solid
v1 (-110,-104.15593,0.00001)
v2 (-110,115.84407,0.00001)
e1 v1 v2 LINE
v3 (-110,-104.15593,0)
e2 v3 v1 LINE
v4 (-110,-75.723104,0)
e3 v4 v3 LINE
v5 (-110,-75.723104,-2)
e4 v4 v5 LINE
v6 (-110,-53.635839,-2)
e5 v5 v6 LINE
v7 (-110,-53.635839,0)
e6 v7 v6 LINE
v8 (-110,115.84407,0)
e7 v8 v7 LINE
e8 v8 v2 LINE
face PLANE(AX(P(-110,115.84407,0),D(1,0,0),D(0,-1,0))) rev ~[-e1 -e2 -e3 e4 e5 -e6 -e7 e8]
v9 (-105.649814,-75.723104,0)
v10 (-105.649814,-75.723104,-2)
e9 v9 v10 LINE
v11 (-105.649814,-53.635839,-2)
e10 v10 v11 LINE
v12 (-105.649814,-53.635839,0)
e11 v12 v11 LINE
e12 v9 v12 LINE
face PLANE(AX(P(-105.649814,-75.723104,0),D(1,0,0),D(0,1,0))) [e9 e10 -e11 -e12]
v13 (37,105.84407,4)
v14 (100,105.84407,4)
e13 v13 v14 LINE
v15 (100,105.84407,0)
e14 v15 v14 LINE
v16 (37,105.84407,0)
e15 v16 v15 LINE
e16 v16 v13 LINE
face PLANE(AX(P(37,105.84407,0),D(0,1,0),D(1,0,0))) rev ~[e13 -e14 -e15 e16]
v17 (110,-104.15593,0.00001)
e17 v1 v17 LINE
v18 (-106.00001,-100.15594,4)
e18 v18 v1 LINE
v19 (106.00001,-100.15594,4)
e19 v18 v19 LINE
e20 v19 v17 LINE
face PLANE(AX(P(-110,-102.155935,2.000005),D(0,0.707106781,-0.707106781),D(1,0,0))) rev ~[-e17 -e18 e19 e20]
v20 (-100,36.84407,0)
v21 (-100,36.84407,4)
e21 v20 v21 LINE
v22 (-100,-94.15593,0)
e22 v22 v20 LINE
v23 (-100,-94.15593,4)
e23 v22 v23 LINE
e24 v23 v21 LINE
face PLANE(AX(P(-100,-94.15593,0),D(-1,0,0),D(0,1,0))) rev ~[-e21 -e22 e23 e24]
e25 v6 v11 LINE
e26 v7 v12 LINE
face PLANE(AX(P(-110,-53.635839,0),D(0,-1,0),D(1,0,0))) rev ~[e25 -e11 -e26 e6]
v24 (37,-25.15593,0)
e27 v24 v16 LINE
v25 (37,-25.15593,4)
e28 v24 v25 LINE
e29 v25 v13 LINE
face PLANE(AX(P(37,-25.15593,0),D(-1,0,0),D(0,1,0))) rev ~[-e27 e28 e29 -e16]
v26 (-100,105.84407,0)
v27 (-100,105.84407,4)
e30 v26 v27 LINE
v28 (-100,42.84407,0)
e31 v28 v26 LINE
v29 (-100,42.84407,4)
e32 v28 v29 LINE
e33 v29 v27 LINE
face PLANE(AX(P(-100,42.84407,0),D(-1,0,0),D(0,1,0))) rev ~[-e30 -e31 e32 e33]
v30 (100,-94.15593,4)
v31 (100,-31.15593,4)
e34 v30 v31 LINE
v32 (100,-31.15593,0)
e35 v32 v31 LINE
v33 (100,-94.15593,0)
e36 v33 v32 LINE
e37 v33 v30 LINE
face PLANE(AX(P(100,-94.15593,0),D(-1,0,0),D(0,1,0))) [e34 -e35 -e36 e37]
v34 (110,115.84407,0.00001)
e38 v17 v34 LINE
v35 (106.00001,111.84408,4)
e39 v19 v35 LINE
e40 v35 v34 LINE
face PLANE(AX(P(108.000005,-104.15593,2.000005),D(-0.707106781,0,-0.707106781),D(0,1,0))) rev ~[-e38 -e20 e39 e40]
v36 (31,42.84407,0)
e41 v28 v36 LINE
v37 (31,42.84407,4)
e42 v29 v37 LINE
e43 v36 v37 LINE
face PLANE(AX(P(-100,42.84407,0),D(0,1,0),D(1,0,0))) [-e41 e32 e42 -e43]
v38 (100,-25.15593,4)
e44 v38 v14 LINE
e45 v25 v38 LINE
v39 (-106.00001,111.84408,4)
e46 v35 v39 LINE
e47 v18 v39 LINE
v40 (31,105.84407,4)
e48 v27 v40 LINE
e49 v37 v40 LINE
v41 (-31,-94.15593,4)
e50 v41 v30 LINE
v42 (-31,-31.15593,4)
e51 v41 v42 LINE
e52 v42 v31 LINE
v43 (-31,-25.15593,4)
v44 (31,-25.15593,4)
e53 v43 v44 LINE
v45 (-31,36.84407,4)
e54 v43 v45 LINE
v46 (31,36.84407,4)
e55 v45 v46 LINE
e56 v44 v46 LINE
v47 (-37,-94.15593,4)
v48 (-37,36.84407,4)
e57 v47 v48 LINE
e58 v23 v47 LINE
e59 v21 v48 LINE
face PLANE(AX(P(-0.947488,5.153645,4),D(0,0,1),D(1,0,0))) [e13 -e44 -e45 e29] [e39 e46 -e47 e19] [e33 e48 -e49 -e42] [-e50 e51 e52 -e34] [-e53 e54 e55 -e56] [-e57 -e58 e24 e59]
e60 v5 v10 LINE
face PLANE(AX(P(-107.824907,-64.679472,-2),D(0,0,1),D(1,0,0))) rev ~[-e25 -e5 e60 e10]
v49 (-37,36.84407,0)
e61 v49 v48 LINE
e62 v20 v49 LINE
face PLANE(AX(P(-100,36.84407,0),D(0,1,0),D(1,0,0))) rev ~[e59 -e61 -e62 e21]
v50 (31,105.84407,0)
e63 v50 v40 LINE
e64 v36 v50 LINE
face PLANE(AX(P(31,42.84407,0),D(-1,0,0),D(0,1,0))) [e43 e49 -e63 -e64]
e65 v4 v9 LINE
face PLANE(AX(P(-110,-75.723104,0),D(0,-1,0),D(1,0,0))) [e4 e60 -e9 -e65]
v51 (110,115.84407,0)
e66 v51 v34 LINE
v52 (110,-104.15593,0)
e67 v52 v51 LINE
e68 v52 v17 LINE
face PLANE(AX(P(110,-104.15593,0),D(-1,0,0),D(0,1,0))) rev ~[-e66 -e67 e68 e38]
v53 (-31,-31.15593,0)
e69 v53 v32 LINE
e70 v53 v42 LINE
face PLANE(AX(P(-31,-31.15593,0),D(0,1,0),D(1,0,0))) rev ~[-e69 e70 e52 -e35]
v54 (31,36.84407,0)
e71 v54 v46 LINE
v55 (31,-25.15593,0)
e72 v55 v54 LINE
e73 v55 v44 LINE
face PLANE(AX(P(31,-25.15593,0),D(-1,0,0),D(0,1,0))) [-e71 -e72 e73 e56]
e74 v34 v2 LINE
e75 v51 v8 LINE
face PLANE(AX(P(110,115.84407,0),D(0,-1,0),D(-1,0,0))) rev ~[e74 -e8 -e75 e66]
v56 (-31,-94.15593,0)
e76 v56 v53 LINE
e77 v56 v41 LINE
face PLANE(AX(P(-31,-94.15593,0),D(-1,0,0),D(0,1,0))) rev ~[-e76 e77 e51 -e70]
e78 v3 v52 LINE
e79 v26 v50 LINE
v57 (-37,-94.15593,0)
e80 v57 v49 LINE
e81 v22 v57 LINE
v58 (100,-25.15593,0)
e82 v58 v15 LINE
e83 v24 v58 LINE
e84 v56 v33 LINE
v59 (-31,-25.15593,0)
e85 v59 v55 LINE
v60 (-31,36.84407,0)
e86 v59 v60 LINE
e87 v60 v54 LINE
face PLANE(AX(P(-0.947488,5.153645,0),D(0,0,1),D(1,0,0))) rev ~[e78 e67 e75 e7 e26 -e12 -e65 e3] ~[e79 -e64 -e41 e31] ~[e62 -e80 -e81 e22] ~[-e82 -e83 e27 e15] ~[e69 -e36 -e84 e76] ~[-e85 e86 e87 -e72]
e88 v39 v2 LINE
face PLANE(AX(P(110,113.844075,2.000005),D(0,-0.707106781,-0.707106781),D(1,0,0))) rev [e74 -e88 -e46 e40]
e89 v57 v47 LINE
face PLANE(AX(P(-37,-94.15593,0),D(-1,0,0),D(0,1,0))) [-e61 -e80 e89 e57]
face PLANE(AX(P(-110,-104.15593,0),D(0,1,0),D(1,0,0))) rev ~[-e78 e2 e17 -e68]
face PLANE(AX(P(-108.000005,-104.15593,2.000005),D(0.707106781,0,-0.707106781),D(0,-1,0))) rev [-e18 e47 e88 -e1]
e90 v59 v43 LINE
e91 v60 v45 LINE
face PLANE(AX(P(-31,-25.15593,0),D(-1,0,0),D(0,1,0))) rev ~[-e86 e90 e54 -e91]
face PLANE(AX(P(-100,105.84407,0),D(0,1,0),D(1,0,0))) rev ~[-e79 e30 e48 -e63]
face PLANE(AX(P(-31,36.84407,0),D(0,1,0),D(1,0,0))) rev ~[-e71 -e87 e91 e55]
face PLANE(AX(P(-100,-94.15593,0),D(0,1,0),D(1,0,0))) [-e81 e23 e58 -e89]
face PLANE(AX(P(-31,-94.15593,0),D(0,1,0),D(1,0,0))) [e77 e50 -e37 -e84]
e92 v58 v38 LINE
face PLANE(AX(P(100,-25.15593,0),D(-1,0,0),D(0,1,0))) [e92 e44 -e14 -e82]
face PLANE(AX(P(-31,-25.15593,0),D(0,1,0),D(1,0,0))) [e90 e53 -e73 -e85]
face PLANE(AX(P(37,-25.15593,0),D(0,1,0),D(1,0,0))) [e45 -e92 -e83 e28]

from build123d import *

# Parameters (mm, degrees)
F0_W     = 63
F0_H     = 131
F0_W_2   = 131
F0_H_2   = 63
F0_W_3   = 62
F0_H_3   = 62
F1_DEPTH = 4
F0_W_4   = 4.3501859903
F0_H_4   = 22.087264806
F2_DEPTH = 4
F3_SIZE  = 3.99999
F4_DEPTH = 2


# Not quite as in the source:
# - a fillet or chamfer is up to 0.001 mm smaller than in the source, because OpenCascade refuses the exact size


with BuildPart() as f1:
    # F0 (on Top) → F1 (new body)
    with BuildSketch(Plane.XY):
        Polygon((110, 115.8440702578), (-110, 115.8440702578), (-110, -53.6358393729), (-105.6498140097, -53.6358393729), (-105.6498140097, -75.7231041789), (-110, -75.7231041789), (-110, -104.1559297422), (110, -104.1559297422), align=None)
        with Locations((-68.5, -28.6559297422)):
            Rectangle(F0_W, F0_H, mode=Mode.SUBTRACT)
        with Locations((34.5, -62.6559297422)):
            Rectangle(F0_W_2, F0_H_2, mode=Mode.SUBTRACT)
        with Locations((-34.5, 74.3440702578)):
            Rectangle(F0_W_2, F0_H_2, mode=Mode.SUBTRACT)
        with Locations((0, 5.8440702578)):
            Rectangle(F0_W_3, F0_H_3, mode=Mode.SUBTRACT)
        with Locations((68.5, 40.3440702578)):
            Rectangle(F0_W, F0_H, mode=Mode.SUBTRACT)
    extrude(amount=F1_DEPTH)

    # F0 (on Top) → F2 (join)
    with BuildSketch(Plane.XY):
        Polygon((110, 115.8440702578), (-110, 115.8440702578), (-110, -53.6358393729), (-105.6498140097, -53.6358393729), (-105.6498140097, -75.7231041789), (-110, -75.7231041789), (-110, -104.1559297422), (110, -104.1559297422), align=None)
        with Locations((-68.5, -28.6559297422)):
            Rectangle(F0_W, F0_H, mode=Mode.SUBTRACT)
        with Locations((34.5, -62.6559297422)):
            Rectangle(F0_W_2, F0_H_2, mode=Mode.SUBTRACT)
        with Locations((-34.5, 74.3440702578)):
            Rectangle(F0_W_2, F0_H_2, mode=Mode.SUBTRACT)
        with Locations((0, 5.8440702578)):
            Rectangle(F0_W_3, F0_H_3, mode=Mode.SUBTRACT)
        with Locations((68.5, 40.3440702578)):
            Rectangle(F0_W, F0_H, mode=Mode.SUBTRACT)
        with Locations((-107.8249070048, -64.6794717759)):
            Rectangle(F0_W_4, F0_H_4)
    extrude(amount=F2_DEPTH)

    # F3 (size 4 in the source; OpenCascade refuses exactly that, so slightly less here)
    f3_edges = [f1.edges().sort_by_distance(p)[0] for p in [
        (0, -104.15593, 4),
        (110, 5.84407, 4),
        (-110, 5.84407, 4),
        (0, 115.84407, 4),
    ]]
    chamfer(f3_edges, length=F3_SIZE)

    # F0 (on Top) → F4 (join)
    with BuildSketch(Plane.XY):
        with Locations((-107.8249070048, -64.6794717759)):
            Rectangle(F0_W_4, F0_H_4)
    extrude(amount=-F4_DEPTH)


solid = f1.part
